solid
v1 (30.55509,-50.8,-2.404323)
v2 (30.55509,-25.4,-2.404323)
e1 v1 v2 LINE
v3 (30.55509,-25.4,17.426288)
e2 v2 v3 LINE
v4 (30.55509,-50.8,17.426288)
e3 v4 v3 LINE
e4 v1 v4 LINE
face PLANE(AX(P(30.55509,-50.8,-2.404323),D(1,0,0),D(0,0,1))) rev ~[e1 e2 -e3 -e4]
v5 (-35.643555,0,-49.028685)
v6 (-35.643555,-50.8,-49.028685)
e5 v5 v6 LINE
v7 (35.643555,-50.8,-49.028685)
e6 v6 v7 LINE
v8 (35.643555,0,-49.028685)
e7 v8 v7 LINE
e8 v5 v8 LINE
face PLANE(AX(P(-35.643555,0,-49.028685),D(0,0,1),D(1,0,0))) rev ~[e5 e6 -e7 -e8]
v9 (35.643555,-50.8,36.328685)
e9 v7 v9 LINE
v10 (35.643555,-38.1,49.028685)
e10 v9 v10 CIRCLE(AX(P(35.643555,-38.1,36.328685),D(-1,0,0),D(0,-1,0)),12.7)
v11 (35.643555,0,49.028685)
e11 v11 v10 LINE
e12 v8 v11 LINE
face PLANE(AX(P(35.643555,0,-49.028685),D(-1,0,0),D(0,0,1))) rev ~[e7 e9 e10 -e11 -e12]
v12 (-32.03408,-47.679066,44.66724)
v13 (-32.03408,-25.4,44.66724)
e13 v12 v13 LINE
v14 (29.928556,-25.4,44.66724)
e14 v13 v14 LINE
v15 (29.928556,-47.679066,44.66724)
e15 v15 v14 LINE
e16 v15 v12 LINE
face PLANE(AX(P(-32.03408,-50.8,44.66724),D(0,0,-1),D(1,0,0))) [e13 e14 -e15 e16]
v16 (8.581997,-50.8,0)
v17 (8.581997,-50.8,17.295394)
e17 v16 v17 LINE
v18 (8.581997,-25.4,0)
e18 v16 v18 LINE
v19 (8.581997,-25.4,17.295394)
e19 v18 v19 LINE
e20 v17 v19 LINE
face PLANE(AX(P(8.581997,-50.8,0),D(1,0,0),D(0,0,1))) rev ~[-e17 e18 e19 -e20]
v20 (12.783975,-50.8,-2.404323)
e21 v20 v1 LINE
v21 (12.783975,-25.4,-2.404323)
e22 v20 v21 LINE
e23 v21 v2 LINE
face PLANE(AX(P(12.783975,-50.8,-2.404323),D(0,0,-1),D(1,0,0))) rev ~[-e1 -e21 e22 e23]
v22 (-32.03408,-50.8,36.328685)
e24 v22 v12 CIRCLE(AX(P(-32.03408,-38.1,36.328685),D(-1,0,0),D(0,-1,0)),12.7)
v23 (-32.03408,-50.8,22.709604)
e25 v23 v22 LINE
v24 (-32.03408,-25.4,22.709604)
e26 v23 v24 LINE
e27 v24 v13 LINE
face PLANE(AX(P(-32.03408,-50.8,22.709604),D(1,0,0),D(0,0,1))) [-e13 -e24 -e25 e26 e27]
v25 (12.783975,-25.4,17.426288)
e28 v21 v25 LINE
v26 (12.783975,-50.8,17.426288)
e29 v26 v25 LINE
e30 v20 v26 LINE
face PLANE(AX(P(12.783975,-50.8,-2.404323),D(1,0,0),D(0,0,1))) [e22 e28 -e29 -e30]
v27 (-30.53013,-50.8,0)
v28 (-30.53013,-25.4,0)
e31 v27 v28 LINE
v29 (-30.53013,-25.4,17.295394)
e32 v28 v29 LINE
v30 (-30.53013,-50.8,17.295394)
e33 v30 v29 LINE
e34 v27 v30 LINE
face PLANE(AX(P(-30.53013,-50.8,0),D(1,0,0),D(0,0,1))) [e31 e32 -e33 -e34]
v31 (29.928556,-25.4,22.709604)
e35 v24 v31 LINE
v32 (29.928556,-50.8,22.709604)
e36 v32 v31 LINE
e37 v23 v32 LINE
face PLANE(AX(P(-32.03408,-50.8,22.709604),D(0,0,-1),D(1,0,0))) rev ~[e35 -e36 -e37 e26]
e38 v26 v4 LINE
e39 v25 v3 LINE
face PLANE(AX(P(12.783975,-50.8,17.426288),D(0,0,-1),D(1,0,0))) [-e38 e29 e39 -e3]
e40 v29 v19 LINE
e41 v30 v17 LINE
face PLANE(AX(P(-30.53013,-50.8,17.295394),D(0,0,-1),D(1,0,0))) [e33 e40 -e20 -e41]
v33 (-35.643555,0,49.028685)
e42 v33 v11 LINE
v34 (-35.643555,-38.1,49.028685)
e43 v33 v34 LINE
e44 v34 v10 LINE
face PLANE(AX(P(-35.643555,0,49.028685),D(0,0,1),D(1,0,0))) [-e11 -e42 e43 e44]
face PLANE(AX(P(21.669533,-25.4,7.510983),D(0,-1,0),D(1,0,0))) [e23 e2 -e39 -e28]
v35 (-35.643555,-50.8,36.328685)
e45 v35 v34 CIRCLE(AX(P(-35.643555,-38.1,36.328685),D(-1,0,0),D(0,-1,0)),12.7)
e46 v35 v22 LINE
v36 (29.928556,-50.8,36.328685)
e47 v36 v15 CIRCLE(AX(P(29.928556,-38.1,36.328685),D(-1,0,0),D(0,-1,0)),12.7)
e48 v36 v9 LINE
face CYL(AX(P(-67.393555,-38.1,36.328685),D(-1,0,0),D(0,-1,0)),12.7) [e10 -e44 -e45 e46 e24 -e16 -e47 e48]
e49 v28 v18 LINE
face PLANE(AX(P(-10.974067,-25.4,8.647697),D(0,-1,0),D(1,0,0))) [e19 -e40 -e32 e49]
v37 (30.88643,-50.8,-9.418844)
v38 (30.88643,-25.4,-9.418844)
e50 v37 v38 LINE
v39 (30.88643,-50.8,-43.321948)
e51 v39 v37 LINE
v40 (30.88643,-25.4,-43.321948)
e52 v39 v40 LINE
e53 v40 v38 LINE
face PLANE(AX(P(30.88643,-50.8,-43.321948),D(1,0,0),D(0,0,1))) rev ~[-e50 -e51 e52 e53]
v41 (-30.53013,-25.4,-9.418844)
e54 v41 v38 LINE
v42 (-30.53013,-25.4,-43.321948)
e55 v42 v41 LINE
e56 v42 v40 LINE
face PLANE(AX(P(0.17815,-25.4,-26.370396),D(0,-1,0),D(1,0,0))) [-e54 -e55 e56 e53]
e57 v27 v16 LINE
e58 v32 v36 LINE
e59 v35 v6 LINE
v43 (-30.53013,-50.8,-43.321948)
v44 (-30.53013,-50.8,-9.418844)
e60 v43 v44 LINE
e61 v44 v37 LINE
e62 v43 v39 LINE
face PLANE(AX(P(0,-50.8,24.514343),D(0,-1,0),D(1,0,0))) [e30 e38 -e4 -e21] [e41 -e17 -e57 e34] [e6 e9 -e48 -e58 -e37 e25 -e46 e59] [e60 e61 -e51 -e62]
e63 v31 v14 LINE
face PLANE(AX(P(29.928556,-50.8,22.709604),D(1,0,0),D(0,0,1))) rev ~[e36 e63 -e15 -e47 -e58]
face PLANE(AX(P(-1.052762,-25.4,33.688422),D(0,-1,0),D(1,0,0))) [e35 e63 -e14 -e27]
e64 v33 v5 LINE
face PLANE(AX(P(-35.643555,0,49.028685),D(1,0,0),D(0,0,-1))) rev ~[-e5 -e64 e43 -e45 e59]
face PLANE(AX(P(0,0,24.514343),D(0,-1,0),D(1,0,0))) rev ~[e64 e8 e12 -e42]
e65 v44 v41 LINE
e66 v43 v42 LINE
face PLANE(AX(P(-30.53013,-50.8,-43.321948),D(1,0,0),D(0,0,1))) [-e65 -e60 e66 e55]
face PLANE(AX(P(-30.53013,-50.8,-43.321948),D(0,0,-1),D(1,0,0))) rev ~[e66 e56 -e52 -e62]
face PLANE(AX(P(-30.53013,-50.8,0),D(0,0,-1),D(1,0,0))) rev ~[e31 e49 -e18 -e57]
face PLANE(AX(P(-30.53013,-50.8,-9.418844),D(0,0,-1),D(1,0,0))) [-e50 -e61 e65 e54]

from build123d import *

# Parameters (mm, degrees)
F0_W        = 71.2871104479
F0_H        = 49.0286853164
F0_W_2      = 58.531470614
F0_H_2      = 36.0211754636
F0_W_3      = 60.9135755652
F0_H_3      = 33.0608540971
F1_DEPTH    = 50.8
F2_W        = 39.112127386
F2_H        = 17.2953940928
F2_W_2      = 17.7711145952
F2_H_2      = 19.8306103703
F2_W_3      = 61.416560784
F2_H_3      = 33.9031042531
F2_W_4      = 61.9626361877
F2_H_4      = 21.9576358795
F3_DEPTH    = 25.4
F4_T1_DEPTH = 134.7871104479


# Not quite as in the source:
# - a fillet or chamfer that OpenCascade refuses, or shapes differently, is made with other operations: its cross-section is extruded or revolved along the edge and cut away or added


with BuildPart() as f1:
    # F0 (on Front) → F1 (new body)
    with BuildSketch(Plane.XZ):
        with Locations((0, 24.5143426582)):
            Rectangle(F0_W, F0_H)
        with Locations((-0.6145685997, 23.0905877318)):
            Rectangle(F0_W_2, F0_H_2, mode=Mode.SUBTRACT)
        with Locations((0, -24.5143426582)):
            Rectangle(F0_W, F0_H)
        with Locations((0.2925068763, -25.7660689676)):
            Rectangle(F0_W_3, F0_H_3, mode=Mode.SUBTRACT)
        with Locations((-0.6145685997, 23.0905877318)):
            Rectangle(F0_W_2, F0_H_2)
        with Locations((0.2925068763, -25.7660689676)):
            Rectangle(F0_W_3, F0_H_3)
    extrude(amount=F1_DEPTH)

    # F2 (on face) → F3 (cut)
    with BuildSketch(Plane.XZ.offset(50.8)):
        with Locations((-10.9740667976, 8.6476970464)):
            Rectangle(F2_W, F2_H)
        with Locations((21.669532638, 7.5109825702)):
            Rectangle(F2_W_2, F2_H_2)
        with Locations((0.1781499013, -26.3703963719)):
            Rectangle(F2_W_3, F2_H_3)
        with Locations((-1.0527623817, 33.6884222925)):
            Rectangle(F2_W_4, F2_H_4)
    extrude(amount=-F3_DEPTH, mode=Mode.SUBTRACT)

    # F4: fillet of radius 12.7 on 1 edges, made by hand

    # F4_s2 → F4_t1 (cut)
    with BuildSketch(Plane.YZ.offset(-67.3935552239)):
        with BuildLine():
            ThreePointArc((-50.8, 36.3286853164), (-47.0802561211, 45.3089414375), (-38.1, 49.0286853164))
            Line((-38.1, 49.0286853164), (-50.8, 49.0286853164))
            Line((-50.8, 49.0286853164), (-50.8, 36.3286853164))
        make_face()
    extrude(amount=F4_T1_DEPTH, mode=Mode.SUBTRACT)


solid = f1.part
